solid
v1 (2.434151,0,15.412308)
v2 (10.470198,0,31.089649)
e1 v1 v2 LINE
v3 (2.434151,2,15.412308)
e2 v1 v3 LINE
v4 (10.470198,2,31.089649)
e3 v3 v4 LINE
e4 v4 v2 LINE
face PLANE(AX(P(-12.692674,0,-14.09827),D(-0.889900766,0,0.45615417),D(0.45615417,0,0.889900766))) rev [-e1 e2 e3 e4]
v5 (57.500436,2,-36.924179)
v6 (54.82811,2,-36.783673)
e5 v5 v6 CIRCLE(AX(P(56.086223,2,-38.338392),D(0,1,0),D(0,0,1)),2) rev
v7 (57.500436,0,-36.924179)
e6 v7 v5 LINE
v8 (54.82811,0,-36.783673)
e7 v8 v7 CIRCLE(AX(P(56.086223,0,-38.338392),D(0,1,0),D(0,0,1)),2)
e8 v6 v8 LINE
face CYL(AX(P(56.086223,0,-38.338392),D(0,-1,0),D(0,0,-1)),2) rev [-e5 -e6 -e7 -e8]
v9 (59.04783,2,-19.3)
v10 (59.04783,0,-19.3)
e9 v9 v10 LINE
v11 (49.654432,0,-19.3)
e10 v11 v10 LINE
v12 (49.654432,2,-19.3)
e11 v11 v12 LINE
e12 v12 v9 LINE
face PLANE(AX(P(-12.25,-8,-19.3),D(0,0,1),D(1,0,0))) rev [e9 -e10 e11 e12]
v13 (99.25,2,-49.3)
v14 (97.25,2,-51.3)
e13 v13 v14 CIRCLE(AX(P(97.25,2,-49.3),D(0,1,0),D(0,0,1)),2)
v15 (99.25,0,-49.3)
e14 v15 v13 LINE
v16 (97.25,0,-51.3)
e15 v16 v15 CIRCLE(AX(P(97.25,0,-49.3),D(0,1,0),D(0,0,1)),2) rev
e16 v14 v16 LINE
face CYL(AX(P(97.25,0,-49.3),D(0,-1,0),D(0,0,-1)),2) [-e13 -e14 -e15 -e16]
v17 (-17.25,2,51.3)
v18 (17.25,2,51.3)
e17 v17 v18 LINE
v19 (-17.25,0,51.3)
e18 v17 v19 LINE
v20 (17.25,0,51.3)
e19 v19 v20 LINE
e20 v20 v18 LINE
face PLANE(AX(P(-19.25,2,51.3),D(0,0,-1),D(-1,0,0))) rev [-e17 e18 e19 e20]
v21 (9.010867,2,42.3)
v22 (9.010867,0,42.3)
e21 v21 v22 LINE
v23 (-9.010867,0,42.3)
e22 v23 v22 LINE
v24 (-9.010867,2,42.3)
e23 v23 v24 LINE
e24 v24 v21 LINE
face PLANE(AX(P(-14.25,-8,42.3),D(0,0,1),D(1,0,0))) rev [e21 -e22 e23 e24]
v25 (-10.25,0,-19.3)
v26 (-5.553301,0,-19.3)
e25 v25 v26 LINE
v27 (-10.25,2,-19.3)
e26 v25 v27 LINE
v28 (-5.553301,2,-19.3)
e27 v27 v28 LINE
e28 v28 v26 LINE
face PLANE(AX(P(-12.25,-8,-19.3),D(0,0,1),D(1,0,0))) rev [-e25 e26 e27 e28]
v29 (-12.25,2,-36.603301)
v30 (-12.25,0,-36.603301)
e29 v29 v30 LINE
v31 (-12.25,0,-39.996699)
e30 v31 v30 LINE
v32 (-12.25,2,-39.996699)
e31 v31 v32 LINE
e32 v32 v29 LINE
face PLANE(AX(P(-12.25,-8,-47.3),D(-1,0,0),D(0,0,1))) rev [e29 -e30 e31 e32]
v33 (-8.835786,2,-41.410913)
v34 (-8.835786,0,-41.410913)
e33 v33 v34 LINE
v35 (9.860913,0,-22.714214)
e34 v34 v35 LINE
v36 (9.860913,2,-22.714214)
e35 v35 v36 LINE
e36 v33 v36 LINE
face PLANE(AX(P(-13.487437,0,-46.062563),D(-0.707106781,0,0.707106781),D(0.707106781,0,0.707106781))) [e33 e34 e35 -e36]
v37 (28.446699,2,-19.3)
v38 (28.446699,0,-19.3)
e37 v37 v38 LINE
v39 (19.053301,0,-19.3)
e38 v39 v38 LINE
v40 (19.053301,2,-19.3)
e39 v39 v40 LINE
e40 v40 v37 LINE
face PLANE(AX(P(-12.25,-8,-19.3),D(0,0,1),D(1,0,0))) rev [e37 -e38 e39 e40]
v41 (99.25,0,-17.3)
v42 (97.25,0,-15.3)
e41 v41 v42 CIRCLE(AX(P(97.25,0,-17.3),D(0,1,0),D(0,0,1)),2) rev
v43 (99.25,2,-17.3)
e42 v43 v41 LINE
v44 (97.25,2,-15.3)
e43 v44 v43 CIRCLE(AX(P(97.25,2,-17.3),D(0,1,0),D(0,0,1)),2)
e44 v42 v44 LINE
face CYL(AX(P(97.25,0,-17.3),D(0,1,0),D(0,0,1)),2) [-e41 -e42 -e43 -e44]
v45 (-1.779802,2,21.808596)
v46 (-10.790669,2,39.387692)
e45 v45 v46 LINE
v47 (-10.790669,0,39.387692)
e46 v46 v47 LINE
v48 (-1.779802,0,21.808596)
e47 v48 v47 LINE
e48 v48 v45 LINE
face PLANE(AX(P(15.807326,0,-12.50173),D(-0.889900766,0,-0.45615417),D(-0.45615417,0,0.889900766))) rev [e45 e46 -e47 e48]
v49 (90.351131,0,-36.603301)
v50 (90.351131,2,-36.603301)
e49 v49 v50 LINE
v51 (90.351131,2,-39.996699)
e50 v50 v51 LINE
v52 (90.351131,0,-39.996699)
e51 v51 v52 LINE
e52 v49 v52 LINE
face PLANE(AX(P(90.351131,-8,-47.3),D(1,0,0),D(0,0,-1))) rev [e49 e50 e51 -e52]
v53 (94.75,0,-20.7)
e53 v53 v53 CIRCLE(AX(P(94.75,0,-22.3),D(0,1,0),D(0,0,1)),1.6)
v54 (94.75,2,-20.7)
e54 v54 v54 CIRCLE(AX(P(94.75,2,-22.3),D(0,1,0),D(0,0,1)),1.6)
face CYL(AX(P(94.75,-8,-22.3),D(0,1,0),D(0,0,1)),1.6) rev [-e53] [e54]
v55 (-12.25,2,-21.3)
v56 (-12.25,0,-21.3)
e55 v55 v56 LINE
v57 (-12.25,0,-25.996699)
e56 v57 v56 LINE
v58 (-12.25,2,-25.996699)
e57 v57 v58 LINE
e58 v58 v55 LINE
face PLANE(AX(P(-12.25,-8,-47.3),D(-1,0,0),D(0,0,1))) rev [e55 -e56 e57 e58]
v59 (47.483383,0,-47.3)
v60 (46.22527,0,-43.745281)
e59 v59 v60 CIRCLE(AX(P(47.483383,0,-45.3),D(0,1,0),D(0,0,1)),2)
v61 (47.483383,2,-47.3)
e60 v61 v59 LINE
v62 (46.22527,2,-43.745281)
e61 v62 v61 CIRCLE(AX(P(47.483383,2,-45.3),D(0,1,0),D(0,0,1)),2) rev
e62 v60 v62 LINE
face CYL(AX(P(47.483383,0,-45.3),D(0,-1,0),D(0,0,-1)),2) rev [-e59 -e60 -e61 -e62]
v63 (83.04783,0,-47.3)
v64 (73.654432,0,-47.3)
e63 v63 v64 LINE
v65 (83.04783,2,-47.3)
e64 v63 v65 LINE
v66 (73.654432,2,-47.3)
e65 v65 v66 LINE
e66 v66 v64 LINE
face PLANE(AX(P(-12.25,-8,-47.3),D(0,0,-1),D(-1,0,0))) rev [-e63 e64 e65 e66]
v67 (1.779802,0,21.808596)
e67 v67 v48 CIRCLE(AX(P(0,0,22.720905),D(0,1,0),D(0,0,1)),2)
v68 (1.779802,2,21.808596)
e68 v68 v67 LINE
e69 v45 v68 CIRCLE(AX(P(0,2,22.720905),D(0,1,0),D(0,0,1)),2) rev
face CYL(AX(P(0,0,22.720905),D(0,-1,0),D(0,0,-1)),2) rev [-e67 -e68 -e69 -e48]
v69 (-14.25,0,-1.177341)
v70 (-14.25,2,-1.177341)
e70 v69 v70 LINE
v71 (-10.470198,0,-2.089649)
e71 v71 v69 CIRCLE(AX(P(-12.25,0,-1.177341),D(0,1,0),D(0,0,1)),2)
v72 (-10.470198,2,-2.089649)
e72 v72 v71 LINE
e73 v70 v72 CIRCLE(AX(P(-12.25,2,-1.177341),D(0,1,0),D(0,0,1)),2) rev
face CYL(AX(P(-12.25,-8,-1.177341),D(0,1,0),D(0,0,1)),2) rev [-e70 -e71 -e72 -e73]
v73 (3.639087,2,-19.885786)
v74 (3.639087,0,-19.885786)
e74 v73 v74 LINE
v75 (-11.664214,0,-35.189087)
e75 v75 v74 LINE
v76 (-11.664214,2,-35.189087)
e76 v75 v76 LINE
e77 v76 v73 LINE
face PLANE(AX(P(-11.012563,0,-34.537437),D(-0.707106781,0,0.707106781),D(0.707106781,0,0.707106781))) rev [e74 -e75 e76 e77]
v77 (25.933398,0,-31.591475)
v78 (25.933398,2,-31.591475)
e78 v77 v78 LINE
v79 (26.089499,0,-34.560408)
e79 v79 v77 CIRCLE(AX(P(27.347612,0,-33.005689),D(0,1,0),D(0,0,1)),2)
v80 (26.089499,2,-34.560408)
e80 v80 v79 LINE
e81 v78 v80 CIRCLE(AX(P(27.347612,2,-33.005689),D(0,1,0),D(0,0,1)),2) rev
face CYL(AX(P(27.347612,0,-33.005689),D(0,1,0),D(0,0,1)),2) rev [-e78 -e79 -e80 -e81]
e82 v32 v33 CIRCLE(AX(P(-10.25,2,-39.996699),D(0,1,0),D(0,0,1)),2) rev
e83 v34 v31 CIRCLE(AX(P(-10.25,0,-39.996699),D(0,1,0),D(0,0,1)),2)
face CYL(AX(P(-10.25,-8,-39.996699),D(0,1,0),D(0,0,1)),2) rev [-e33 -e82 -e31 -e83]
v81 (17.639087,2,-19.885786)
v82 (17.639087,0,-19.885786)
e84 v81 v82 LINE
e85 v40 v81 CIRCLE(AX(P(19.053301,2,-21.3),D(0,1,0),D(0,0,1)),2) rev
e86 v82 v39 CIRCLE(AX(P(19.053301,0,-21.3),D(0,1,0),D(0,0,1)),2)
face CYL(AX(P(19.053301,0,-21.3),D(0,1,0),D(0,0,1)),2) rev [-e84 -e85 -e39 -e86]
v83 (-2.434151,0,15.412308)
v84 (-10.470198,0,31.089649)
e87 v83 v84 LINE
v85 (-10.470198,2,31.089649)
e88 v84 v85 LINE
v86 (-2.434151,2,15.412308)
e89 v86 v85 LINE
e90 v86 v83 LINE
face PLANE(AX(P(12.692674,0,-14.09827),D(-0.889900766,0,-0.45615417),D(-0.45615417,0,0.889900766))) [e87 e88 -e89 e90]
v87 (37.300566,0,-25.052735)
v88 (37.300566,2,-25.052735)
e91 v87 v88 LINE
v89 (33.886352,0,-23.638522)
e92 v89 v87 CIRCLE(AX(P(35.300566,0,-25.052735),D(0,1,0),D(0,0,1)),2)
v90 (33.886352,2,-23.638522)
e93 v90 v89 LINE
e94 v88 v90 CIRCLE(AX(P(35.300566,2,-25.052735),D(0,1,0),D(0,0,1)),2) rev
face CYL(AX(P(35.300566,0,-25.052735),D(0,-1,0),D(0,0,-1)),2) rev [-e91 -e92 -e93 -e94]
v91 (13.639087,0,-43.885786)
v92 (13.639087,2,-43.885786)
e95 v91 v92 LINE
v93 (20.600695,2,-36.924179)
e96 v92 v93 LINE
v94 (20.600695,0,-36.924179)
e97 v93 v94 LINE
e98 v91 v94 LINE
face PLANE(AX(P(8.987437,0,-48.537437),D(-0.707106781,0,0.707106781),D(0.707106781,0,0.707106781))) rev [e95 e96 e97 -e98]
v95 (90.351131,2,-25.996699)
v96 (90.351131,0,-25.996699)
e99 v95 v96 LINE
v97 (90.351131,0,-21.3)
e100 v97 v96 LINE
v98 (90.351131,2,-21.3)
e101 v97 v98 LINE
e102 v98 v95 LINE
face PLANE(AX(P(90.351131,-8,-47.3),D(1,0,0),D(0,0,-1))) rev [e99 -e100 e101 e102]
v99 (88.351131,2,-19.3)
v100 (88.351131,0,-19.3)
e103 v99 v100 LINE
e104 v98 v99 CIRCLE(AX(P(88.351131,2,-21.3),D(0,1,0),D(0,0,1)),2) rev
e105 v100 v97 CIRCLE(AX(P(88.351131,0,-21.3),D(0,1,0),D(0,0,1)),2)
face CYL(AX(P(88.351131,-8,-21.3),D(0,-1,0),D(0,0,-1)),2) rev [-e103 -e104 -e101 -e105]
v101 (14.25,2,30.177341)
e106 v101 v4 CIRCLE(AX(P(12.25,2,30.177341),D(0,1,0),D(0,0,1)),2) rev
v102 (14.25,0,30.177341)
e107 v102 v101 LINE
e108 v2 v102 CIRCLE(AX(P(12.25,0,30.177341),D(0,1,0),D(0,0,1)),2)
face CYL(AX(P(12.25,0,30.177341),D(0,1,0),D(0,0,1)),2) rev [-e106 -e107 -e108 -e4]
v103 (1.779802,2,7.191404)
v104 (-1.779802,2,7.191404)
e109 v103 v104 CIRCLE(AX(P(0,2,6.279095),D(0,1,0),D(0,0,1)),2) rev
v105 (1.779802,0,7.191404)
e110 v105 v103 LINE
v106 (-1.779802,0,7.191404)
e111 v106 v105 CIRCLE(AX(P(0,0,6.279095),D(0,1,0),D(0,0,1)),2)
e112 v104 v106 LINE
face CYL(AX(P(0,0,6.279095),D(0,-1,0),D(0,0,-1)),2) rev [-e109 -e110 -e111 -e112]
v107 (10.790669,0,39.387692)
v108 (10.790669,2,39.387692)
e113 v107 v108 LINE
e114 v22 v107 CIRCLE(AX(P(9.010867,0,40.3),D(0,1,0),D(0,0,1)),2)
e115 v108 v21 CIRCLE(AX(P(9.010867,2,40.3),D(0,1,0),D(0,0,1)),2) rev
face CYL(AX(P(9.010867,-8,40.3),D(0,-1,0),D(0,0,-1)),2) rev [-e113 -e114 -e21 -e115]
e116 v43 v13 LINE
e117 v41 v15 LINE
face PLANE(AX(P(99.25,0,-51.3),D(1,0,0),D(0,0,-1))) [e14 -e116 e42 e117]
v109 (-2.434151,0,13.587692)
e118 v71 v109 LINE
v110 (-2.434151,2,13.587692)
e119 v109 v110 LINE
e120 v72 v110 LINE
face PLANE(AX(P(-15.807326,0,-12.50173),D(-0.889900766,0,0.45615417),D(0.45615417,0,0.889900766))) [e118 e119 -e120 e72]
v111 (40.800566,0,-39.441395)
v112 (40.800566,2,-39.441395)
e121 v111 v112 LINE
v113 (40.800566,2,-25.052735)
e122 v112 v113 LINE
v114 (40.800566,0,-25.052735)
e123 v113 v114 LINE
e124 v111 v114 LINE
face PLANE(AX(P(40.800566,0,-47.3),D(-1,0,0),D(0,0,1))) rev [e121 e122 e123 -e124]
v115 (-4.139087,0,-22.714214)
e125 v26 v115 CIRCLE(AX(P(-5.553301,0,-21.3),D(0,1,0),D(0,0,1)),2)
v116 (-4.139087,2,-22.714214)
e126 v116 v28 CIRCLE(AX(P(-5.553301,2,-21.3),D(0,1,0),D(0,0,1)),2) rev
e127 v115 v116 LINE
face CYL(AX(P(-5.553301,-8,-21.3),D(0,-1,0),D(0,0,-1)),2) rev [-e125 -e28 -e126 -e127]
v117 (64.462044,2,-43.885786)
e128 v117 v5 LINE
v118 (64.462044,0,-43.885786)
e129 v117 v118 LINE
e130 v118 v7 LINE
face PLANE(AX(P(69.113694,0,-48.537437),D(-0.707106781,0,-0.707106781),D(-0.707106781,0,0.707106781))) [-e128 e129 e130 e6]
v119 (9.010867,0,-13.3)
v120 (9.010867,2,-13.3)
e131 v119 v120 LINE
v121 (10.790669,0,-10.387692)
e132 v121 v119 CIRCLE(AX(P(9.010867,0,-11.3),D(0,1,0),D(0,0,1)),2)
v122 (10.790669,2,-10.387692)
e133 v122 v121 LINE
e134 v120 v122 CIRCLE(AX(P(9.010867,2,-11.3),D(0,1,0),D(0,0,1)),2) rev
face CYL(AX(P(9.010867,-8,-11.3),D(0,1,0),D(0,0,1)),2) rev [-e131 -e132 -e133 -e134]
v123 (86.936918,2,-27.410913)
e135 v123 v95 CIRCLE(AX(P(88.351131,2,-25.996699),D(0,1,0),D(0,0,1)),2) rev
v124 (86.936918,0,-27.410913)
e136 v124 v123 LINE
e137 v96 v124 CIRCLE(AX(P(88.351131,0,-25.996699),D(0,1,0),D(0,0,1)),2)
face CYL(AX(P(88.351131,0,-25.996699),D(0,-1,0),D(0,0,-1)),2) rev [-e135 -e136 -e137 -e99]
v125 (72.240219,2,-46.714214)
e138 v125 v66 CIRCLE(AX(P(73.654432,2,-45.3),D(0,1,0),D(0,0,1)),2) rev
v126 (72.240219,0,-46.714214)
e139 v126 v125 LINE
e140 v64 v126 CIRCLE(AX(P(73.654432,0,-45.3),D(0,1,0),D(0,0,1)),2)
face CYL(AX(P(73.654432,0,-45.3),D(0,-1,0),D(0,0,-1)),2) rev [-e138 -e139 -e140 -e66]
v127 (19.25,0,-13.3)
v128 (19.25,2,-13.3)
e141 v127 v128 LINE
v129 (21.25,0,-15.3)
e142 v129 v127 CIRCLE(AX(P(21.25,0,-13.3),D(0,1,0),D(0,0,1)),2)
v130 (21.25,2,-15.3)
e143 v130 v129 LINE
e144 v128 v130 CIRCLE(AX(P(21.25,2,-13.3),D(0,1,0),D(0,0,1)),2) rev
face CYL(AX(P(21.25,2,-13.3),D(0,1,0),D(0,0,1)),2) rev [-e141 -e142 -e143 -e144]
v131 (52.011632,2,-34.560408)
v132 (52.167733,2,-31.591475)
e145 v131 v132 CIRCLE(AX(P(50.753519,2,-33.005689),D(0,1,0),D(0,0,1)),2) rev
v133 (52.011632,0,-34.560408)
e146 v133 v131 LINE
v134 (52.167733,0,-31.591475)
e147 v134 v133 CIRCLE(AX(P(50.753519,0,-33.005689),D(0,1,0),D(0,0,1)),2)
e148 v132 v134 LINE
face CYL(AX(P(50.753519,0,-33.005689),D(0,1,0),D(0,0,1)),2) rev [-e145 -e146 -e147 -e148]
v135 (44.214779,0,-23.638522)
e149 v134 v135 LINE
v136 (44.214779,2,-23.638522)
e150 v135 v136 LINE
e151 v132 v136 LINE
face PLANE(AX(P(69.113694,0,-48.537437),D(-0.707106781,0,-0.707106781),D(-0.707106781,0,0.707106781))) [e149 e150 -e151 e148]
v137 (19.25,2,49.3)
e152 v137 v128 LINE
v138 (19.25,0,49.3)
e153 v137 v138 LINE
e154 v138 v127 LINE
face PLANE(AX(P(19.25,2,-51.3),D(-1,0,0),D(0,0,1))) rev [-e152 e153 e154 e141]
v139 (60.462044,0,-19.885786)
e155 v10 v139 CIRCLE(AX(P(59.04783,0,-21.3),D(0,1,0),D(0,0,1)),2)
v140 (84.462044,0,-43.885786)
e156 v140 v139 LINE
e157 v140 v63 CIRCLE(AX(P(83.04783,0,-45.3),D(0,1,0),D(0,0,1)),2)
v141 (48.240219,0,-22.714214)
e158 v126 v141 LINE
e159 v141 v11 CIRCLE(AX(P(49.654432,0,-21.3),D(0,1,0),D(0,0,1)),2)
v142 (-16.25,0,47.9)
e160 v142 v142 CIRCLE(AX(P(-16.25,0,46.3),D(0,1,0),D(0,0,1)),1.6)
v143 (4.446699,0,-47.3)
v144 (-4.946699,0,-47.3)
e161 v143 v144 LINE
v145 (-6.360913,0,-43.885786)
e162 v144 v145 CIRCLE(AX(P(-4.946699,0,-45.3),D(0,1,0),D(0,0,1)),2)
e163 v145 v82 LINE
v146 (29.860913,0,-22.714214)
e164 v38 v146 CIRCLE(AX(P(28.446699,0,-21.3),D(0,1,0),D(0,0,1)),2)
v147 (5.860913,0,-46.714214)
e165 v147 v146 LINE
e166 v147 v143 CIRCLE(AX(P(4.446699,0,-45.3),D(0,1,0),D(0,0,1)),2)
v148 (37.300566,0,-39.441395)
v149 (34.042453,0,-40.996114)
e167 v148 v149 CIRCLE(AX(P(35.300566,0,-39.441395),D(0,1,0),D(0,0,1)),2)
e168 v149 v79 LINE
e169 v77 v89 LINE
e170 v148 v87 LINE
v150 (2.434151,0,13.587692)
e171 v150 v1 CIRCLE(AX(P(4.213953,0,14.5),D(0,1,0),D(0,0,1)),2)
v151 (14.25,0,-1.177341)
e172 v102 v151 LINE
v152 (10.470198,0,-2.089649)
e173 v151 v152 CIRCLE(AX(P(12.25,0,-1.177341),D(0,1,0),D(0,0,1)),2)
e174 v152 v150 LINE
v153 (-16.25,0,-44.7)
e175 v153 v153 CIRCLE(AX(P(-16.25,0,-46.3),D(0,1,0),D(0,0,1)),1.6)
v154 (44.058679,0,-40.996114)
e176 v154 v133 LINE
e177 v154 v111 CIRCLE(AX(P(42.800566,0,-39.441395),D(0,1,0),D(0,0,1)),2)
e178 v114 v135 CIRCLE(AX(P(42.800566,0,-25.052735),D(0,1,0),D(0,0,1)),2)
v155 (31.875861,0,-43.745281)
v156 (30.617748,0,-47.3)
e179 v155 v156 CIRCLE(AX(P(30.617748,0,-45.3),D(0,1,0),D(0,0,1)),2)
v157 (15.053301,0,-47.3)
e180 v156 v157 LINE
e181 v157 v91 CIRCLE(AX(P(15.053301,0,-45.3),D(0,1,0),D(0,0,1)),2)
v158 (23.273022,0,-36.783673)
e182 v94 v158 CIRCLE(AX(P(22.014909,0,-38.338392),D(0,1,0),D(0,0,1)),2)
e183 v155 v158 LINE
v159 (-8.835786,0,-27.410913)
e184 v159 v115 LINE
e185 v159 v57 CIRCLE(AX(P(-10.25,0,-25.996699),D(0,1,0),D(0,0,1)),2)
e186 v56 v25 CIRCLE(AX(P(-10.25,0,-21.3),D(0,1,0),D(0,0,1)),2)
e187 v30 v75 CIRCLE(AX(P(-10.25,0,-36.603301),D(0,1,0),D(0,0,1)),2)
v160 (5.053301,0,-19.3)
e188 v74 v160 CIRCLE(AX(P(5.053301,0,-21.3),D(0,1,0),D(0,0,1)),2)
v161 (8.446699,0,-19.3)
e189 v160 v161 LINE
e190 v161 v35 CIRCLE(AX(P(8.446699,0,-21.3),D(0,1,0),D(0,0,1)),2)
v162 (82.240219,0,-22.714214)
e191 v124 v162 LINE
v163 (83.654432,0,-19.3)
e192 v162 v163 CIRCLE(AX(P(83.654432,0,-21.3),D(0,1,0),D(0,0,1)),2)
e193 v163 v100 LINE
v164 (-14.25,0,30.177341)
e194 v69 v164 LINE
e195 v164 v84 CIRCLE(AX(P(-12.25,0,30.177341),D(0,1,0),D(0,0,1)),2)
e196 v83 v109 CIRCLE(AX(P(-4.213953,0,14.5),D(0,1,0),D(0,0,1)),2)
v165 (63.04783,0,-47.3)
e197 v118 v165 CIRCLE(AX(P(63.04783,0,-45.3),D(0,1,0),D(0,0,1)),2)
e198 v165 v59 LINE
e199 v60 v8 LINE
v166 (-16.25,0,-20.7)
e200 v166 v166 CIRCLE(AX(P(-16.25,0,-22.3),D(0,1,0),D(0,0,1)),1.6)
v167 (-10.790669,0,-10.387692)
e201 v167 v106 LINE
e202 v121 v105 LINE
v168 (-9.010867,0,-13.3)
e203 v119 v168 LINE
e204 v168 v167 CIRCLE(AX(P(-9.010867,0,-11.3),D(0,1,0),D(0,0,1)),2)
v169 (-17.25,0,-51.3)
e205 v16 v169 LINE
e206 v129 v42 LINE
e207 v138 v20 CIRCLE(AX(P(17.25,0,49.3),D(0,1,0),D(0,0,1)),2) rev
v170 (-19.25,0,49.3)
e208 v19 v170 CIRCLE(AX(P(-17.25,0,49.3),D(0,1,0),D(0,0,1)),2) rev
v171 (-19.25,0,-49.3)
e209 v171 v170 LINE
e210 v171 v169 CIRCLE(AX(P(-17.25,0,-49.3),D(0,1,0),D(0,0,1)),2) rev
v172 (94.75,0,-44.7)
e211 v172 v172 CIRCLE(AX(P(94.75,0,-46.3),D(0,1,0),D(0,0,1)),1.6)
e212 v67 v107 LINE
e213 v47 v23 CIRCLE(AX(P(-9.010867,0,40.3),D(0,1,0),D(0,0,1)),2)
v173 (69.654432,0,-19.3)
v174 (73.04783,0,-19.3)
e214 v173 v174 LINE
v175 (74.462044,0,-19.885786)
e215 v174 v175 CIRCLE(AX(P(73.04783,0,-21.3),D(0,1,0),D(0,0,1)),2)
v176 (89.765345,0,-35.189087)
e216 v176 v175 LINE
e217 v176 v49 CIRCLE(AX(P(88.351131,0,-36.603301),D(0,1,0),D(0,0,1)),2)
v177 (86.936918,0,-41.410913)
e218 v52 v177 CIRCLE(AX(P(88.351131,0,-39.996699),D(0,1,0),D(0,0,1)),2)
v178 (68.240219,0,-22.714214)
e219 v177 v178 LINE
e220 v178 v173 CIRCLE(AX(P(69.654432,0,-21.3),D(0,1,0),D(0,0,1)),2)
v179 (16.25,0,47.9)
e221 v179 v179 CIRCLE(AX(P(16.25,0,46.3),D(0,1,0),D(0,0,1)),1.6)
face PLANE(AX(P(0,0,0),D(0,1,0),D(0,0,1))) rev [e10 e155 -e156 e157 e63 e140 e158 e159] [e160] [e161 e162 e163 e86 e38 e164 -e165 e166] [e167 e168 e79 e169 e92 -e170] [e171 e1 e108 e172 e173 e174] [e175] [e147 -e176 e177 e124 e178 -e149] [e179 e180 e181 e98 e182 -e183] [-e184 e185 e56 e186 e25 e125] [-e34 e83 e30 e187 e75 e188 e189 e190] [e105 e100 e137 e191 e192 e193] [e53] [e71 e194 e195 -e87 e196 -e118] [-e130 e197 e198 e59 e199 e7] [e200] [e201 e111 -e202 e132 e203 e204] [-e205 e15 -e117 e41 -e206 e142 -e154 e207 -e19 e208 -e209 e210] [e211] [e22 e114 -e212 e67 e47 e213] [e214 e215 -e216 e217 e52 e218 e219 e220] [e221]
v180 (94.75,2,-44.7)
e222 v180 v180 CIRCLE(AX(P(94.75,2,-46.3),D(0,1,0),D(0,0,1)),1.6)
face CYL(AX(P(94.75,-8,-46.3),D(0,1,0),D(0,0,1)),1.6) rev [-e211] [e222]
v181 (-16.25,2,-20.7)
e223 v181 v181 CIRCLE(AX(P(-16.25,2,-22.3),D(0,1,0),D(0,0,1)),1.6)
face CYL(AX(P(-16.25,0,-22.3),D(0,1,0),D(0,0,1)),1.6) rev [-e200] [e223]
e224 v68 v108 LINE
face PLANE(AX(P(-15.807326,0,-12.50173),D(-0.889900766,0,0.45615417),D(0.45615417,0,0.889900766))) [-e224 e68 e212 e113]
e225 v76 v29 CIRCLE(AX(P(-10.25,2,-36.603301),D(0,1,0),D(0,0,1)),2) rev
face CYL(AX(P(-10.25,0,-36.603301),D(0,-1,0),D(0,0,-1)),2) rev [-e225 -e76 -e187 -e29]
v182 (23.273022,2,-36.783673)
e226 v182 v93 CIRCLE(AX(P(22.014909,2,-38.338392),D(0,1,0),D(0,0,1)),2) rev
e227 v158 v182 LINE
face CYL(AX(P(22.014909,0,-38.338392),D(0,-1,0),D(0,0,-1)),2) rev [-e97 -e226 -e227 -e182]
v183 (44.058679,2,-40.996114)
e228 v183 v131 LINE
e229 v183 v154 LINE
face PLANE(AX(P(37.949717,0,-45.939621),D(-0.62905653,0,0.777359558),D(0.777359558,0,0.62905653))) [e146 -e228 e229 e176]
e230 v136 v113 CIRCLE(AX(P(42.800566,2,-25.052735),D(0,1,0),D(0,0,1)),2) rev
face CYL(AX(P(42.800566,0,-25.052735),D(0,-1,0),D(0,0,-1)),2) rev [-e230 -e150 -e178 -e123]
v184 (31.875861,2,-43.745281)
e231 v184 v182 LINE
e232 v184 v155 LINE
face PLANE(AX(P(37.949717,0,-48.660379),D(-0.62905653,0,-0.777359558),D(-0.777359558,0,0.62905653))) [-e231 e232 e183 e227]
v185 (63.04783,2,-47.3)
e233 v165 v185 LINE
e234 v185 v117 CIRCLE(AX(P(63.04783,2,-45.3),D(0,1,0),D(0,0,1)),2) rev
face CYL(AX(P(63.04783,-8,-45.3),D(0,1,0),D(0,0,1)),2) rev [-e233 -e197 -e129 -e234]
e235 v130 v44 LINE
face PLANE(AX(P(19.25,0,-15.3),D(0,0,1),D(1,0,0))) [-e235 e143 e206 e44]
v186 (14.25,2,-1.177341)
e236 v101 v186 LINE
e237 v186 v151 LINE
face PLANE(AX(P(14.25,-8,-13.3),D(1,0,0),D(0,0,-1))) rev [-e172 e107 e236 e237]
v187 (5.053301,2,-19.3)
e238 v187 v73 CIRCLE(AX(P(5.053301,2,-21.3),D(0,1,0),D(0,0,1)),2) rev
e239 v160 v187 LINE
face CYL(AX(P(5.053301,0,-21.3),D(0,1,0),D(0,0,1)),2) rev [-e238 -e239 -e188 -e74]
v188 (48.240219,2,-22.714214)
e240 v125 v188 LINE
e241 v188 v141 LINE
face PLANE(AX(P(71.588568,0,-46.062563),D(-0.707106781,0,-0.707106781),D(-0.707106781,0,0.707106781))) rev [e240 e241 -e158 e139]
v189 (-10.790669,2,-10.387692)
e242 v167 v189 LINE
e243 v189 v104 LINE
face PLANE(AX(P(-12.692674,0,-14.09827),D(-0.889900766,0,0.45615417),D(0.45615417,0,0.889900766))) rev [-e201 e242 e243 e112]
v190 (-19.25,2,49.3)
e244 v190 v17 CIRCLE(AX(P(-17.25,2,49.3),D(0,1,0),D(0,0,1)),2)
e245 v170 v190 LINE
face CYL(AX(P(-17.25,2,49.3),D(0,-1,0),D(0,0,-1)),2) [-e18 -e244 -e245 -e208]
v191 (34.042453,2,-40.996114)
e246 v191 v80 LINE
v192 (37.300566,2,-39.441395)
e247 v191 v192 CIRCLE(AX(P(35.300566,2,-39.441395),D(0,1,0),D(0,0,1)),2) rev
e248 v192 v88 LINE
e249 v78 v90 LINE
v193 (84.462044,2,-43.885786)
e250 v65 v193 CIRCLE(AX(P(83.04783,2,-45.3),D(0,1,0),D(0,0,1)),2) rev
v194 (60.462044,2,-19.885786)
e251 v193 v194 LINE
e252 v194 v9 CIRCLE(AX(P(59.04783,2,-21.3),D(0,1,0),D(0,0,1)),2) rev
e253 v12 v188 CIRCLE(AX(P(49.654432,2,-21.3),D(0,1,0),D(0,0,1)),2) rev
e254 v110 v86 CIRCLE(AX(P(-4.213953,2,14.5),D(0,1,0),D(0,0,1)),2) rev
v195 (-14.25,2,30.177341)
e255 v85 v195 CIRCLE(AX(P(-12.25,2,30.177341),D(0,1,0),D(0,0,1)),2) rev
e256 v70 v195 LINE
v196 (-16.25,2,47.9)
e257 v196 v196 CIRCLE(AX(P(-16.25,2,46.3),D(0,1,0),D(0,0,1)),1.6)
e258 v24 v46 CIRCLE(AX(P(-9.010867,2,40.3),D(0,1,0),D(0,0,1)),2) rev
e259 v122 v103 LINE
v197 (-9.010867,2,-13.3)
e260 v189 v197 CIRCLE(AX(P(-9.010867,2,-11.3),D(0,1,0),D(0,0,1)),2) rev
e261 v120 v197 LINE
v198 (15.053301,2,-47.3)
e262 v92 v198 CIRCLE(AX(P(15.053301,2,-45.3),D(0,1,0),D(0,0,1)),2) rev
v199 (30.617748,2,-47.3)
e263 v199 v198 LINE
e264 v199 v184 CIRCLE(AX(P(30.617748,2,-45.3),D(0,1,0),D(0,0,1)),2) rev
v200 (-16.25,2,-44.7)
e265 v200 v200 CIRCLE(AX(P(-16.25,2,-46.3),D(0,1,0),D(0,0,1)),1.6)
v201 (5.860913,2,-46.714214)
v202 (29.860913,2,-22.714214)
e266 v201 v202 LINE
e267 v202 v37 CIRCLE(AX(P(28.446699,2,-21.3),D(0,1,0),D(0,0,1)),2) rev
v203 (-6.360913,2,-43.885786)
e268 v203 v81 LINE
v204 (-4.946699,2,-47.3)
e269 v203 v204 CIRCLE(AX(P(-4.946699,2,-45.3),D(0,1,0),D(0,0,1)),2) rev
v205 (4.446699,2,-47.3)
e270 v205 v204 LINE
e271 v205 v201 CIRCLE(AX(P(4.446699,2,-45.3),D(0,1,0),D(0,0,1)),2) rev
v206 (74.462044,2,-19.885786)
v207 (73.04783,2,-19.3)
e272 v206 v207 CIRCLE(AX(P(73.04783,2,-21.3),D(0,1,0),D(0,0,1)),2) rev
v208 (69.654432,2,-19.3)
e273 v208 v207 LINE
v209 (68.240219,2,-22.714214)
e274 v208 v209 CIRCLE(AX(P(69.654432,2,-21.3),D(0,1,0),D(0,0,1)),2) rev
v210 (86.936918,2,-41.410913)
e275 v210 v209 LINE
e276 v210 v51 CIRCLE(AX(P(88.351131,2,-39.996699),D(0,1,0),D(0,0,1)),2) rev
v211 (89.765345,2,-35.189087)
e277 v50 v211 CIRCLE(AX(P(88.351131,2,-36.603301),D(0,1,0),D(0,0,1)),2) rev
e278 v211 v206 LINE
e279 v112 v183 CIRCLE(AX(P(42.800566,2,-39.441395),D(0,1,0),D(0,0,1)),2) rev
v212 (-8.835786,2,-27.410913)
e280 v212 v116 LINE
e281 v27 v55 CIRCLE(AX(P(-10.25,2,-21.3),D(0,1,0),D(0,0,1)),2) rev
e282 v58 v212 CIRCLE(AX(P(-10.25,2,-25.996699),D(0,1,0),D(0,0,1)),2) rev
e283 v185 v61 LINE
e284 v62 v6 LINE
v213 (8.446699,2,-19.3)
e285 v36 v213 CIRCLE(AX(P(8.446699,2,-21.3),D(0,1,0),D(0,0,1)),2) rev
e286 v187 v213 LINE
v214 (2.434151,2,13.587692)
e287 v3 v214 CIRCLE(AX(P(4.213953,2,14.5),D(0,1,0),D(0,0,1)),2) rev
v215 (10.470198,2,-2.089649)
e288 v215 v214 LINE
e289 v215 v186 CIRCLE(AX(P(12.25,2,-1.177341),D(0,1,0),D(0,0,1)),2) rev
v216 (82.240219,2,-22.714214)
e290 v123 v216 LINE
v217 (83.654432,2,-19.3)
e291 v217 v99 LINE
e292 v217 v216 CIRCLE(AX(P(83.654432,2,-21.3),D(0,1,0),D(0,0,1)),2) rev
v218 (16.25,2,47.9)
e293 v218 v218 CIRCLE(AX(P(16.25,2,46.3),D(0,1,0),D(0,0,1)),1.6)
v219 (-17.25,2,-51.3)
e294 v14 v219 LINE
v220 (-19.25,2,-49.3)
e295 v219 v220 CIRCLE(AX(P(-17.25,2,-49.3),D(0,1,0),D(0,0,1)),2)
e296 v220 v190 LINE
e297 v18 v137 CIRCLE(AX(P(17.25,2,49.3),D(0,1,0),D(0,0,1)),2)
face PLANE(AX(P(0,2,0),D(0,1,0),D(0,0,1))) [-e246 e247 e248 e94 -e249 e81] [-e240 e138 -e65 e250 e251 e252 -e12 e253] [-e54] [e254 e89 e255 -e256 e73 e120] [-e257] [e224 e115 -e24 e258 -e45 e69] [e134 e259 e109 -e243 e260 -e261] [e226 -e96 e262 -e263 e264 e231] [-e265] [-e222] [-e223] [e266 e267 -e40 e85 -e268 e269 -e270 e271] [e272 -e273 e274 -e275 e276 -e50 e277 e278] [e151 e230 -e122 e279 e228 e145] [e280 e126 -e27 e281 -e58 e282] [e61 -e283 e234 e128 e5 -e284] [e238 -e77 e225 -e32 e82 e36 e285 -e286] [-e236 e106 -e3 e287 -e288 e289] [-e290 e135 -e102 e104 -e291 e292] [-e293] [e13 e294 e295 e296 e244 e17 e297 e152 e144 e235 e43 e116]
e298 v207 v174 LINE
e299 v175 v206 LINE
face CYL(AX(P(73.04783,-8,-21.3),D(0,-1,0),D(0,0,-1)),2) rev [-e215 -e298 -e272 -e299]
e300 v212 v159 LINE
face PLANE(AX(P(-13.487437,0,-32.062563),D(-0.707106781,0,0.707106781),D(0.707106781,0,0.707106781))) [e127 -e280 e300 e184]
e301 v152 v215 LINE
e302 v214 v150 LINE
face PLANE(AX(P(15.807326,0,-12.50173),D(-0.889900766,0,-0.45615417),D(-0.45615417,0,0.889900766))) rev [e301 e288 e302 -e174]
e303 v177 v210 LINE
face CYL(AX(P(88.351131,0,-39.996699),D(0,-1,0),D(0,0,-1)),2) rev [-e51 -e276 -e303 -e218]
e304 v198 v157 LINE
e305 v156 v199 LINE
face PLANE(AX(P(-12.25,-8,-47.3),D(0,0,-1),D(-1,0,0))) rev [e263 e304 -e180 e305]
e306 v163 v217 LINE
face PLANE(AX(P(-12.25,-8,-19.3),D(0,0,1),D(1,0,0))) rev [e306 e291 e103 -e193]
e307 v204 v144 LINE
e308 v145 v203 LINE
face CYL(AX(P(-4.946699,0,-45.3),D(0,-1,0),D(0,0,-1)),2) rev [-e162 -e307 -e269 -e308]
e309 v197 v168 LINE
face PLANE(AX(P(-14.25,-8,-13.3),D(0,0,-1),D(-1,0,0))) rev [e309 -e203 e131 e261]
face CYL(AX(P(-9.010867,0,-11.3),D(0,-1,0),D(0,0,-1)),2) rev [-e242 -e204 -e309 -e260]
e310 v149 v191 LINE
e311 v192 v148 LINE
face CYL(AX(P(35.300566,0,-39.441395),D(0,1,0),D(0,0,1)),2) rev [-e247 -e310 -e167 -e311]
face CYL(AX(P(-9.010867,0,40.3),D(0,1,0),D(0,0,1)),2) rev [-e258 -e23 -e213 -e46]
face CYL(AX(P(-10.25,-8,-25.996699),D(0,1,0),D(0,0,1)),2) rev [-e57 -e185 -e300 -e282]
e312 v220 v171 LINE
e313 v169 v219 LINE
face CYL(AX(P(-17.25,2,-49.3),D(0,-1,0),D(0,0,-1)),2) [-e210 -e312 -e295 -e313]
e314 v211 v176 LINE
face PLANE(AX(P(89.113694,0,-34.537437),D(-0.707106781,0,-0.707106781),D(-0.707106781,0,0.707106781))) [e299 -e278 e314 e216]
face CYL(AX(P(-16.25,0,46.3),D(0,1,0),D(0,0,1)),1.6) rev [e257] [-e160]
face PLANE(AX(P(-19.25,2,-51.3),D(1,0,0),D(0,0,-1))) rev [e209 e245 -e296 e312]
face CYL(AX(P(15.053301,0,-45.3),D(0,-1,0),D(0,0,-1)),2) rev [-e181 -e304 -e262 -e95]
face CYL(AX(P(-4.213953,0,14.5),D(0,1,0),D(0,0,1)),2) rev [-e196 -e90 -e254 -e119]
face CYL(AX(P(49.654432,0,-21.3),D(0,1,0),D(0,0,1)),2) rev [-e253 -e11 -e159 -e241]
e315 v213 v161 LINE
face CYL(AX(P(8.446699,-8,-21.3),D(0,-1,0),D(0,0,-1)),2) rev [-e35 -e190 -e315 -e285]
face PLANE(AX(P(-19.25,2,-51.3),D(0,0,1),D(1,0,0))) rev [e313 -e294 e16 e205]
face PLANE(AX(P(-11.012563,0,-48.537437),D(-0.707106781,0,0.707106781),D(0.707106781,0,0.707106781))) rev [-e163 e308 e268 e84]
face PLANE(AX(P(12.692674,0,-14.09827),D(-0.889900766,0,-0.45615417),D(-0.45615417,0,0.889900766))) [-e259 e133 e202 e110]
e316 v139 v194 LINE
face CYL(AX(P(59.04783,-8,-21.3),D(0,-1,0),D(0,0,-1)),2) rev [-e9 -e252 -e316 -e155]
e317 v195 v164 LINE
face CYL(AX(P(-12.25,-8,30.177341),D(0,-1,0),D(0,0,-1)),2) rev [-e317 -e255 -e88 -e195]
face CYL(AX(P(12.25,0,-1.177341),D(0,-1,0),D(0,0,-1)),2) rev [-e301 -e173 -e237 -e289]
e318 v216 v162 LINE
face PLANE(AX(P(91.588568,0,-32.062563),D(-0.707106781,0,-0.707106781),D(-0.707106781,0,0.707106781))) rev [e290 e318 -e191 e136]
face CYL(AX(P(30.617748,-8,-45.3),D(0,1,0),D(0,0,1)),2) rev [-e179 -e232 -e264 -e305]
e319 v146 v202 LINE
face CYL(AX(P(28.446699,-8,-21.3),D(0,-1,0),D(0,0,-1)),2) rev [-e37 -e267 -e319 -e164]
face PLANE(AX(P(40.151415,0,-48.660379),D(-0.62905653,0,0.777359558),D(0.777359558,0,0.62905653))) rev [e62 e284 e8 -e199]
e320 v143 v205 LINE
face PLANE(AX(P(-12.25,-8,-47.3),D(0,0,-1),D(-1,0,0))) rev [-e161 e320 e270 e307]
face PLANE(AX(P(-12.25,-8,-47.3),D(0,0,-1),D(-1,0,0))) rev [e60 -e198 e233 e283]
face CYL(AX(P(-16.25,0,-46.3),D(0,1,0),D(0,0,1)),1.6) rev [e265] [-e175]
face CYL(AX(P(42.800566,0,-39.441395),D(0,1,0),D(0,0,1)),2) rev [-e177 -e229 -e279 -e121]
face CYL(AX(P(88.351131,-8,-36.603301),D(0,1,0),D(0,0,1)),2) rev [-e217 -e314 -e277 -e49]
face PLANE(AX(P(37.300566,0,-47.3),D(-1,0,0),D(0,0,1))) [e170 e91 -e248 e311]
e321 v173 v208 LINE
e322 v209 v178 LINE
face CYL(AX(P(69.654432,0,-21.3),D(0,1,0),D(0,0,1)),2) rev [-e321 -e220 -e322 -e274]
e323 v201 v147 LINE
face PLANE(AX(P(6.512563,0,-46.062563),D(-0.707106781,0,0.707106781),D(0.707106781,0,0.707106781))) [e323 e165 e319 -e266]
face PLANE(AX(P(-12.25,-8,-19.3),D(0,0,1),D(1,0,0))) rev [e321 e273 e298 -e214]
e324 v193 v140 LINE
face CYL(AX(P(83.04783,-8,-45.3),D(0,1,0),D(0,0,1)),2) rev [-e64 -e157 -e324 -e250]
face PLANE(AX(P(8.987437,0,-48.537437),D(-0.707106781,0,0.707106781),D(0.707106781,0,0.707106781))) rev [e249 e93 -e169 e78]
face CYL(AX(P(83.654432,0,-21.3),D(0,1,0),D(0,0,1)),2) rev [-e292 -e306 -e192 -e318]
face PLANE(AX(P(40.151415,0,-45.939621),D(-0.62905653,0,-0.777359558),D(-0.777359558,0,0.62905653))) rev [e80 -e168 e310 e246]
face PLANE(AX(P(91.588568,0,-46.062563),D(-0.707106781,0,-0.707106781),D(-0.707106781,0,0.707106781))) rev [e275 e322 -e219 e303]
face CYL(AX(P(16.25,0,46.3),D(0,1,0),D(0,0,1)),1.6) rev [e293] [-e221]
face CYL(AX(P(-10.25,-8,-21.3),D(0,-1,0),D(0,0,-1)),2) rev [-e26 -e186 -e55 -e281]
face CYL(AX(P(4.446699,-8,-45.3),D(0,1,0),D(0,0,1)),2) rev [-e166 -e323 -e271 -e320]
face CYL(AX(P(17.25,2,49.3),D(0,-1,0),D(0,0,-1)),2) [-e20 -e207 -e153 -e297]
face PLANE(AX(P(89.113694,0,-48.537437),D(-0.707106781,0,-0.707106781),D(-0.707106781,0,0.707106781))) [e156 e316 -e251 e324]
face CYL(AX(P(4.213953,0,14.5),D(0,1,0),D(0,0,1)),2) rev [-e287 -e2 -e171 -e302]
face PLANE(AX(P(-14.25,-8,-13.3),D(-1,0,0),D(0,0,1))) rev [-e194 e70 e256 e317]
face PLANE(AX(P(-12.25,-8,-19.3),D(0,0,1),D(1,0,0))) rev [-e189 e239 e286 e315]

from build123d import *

# Parameters (mm, degrees)
SKETCH_1_W          = 38.5
SKETCH_1_H          = 102.6
EXTRUDE_1_DEPTH     = 2
SKETCH_2_R          = 1.6
CUT_EXTRUDE_1_DEPTH = 2
SKETCH_3_W          = 80
SKETCH_3_H          = 36
EXTRUDE_2_DEPTH     = 2
SKETCH_4_R          = 1.6
SKETCH_4_W          = 28.5
SKETCH_4_H          = 55.6
SKETCH_4_W_2        = 102.60113133
SKETCH_4_H_2        = 28
CUT_EXTRUDE_2_DEPTH = 10
EXTRUDE_START       = -2
EXTRUDE_2_2_DEPTH   = 2
FILLET_1_R          = 2
FILLET_2_R          = 2


# Read off the part's stored shape, not the designer's step: 拉伸-薄壁2
with BuildPart() as part:
    # 草图1 → 凸台-拉伸1 (new body)
    with BuildSketch(Plane(origin=(0, 0, 0), x_dir=(1, 0, 0), z_dir=(0, 1, 0))):
        Rectangle(SKETCH_1_W, SKETCH_1_H)
    extrude(amount=EXTRUDE_1_DEPTH)

    # 草图2 → 切除-拉伸1 (cut)
    with BuildSketch(Plane(origin=(0, 2, 0), x_dir=(1, 0, 0), z_dir=(0, 1, 0))):
        with Locations(Location((-16.25, -46.3, 0), (0, 0, 270))):
            Circle(SKETCH_2_R)
        with Locations(Location((16.25, -46.3, 0), (0, 0, 270))):
            Circle(SKETCH_2_R)
        with Locations(Location((-16.25, 22.3, 0), (0, 0, 270))):
            Circle(SKETCH_2_R)
        with Locations(Location((-16.25, 46.3, 0), (0, 0, 270))):
            Circle(SKETCH_2_R)
    extrude(amount=-CUT_EXTRUDE_1_DEPTH, mode=Mode.SUBTRACT)

    # 草图3 → Extrude 2 (add)
    with BuildSketch(Plane(origin=(0, 2, 0), x_dir=(1, 0, 0), z_dir=(0, 1, 0))):
        with Locations((59.25, 33.3)):
            Rectangle(SKETCH_3_W, SKETCH_3_H)
    extrude(amount=-EXTRUDE_2_DEPTH)

    # 草图4 → 切除-拉伸2 (cut)
    with BuildSketch(Plane(origin=(0, 2, 0), x_dir=(1, 0, 0), z_dir=(0, 1, 0))):
        with Locations(Location((94.75, 46.3, 0), (0, 0, 270))):
            Circle(SKETCH_4_R)
        with Locations(Location((94.75, 22.3, 0), (0, 0, 270))):
            Circle(SKETCH_4_R)
        with Locations(Location((-16.25, 22.3, 0), (0, 0, 270))):
            Circle(SKETCH_4_R)
        with Locations(Location((-16.25, 46.3, 0), (0, 0, 270))):
            Circle(SKETCH_4_R)
        with Locations((0, -14.5)):
            Rectangle(SKETCH_4_W, SKETCH_4_H)
        with Locations((39.050565665, 33.3)):
            Rectangle(SKETCH_4_W_2, SKETCH_4_H_2)
    extrude(amount=-CUT_EXTRUDE_2_DEPTH, mode=Mode.SUBTRACT)

    # Extrude 2 2 outline → Extrude 2 2 (add)
    # profile 1 of 6: a face of its own
    with BuildSketch(Plane(origin=(0, 2, 0), x_dir=(1, 0, 0), z_dir=(0, 1, 0)).offset(EXTRUDE_START)):
        Polygon((21.873623978, 35.651249756), (10.224873734, 47.3), (5.275126266, 47.3), (33.275126266, 19.3), (44.826005064, 19.3), (72.826005064, 47.3), (67.876257596, 47.3), (56.227507352, 35.651249756), (41.832509602, 47.3), (36.268621728, 47.3), align=None)
        Polygon((37.300565665, 20.224308069), (24.362218946, 33.162654788), (37.300565665, 43.632650831), align=None, mode=Mode.SUBTRACT)
        Polygon((40.800565665, 43.632650831), (53.738912383, 33.162654788), (40.800565665, 20.224308069), align=None, mode=Mode.SUBTRACT)
    # profile 2 of 6: a face of its own
    with BuildSketch(Plane(origin=(0, 2, 0), x_dir=(1, 0, 0), z_dir=(0, 1, 0)).offset(EXTRUDE_START)):
        Polygon((18.224873734, 19.3), (-9.775126266, 47.3), (-12.25, 47.3), (-12.25, 44.825126266), (13.275126266, 19.3), align=None)
    # profile 3 of 6: a face of its own
    with BuildSketch(Plane(origin=(0, 2, 0), x_dir=(1, 0, 0), z_dir=(0, 1, 0)).offset(EXTRUDE_START)):
        Polygon((87.876257596, 47.3), (59.876257596, 19.3), (64.826005064, 19.3), (90.35113133, 44.825126266), (90.35113133, 47.3), align=None)
    # profile 4 of 6: a face of its own
    with BuildSketch(Plane(origin=(0, 2, 0), x_dir=(1, 0, 0), z_dir=(0, 1, 0)).offset(EXTRUDE_START)):
        Polygon((-0.724873734, 19.3), (4.224873734, 19.3), (-12.25, 35.774873734), (-12.25, 30.825126266), align=None)
    # profile 5 of 6: a face of its own
    with BuildSketch(Plane(origin=(0, 2, 0), x_dir=(1, 0, 0), z_dir=(0, 1, 0)).offset(EXTRUDE_START)):
        Polygon((90.35113133, 35.774873734), (73.876257596, 19.3), (78.826005064, 19.3), (90.35113133, 30.825126266), align=None)
    # profile 6 of 6: a face of its own
    with BuildSketch(Plane(origin=(0, 2, 0), x_dir=(1, 0, 0), z_dir=(0, 1, 0)).offset(EXTRUDE_START)):
        Polygon((-14.25, 13.3), (-14.25, 9.463577763), (-1.966511398, -14.5), (-14.25, -38.463577763), (-14.25, -42.3), (-12.283488602, -42.3), (0, -18.336422237), (12.283488602, -42.3), (14.25, -42.3), (14.25, -38.463577763), (1.966511398, -14.5), (14.25, 9.463577763), (14.25, 13.3), (12.283488602, 13.3), (0, -10.663577763), (-12.283488602, 13.3), align=None)
    extrude(amount=EXTRUDE_2_2_DEPTH)

    # 圆角1
    fillet_1_edges = [part.edges().sort_by_distance(p)[0] for p in [
        (44.826005064, 1, -19.3),
        (33.275126266, 1, -19.3),
        (36.268621728, 1, -47.3),
        (67.876257596, 1, -47.3),
        (41.832509602, 1, -47.3),
        (10.224873734, 1, -47.3),
        (21.873623978, 1, -35.651249756),
        (56.227507352, 1, -35.651249756),
        (5.275126266, 1, -47.3),
        (72.826005064, 1, -47.3),
        (37.300565665, 1, -20.224308069),
        (40.800565665, 1, -43.632650831),
        (40.800565665, 1, -20.224308069),
        (53.738912383, 1, -33.162654788),
        (24.362218946, 1, -33.162654788),
        (37.300565665, 1, -43.632650831),
        (90.35113133, 1, -30.825126266),
        (90.35113133, 1, -35.774873734),
        (73.876257596, 1, -19.3),
        (78.826005064, 1, -19.3),
        (90.35113133, 1, -44.825126266),
        (87.876257596, 1, -47.3),
        (64.826005064, 1, -19.3),
        (59.876257596, 1, -19.3),
        (18.224873734, 1, -19.3),
        (13.275126266, 1, -19.3),
        (-12.25, 1, -44.825126266),
        (-9.775126266, 1, -47.3),
        (4.224873734, 1, -19.3),
        (-0.724873734, 1, -19.3),
        (-12.25, 1, -30.825126266),
        (-12.25, 1, -35.774873734),
        (-12.283488602, 1, 42.3),
        (12.283488602, 1, 42.3),
        (14.25, 1, -9.463577763),
        (14.25, 1, 38.463577763),
        (12.283488602, 1, -13.3),
        (-12.283488602, 1, -13.3),
        (-14.25, 1, 38.463577763),
        (-14.25, 1, -9.463577763),
        (-1.966511398, 1, 14.5),
        (0, 1, 10.663577763),
        (1.966511398, 1, 14.5),
        (0, 1, 18.336422237),
        (-12.25, 1, -19.3),
        (90.35113133, 1, -19.3),
    ]]
    fillet(fillet_1_edges, radius=FILLET_1_R)

    # 圆角2
    fillet_2_edges = [part.edges().sort_by_distance(p)[0] for p in [
        (19.25, 1, -15.3),
        (99.25, 1, -51.3),
        (99.25, 1, -15.3),
        (19.25, 1, 51.3),
        (-19.25, 1, 51.3),
        (-19.25, 1, -51.3),
    ]]
    fillet(fillet_2_edges, radius=FILLET_2_R)


solid = part.part
